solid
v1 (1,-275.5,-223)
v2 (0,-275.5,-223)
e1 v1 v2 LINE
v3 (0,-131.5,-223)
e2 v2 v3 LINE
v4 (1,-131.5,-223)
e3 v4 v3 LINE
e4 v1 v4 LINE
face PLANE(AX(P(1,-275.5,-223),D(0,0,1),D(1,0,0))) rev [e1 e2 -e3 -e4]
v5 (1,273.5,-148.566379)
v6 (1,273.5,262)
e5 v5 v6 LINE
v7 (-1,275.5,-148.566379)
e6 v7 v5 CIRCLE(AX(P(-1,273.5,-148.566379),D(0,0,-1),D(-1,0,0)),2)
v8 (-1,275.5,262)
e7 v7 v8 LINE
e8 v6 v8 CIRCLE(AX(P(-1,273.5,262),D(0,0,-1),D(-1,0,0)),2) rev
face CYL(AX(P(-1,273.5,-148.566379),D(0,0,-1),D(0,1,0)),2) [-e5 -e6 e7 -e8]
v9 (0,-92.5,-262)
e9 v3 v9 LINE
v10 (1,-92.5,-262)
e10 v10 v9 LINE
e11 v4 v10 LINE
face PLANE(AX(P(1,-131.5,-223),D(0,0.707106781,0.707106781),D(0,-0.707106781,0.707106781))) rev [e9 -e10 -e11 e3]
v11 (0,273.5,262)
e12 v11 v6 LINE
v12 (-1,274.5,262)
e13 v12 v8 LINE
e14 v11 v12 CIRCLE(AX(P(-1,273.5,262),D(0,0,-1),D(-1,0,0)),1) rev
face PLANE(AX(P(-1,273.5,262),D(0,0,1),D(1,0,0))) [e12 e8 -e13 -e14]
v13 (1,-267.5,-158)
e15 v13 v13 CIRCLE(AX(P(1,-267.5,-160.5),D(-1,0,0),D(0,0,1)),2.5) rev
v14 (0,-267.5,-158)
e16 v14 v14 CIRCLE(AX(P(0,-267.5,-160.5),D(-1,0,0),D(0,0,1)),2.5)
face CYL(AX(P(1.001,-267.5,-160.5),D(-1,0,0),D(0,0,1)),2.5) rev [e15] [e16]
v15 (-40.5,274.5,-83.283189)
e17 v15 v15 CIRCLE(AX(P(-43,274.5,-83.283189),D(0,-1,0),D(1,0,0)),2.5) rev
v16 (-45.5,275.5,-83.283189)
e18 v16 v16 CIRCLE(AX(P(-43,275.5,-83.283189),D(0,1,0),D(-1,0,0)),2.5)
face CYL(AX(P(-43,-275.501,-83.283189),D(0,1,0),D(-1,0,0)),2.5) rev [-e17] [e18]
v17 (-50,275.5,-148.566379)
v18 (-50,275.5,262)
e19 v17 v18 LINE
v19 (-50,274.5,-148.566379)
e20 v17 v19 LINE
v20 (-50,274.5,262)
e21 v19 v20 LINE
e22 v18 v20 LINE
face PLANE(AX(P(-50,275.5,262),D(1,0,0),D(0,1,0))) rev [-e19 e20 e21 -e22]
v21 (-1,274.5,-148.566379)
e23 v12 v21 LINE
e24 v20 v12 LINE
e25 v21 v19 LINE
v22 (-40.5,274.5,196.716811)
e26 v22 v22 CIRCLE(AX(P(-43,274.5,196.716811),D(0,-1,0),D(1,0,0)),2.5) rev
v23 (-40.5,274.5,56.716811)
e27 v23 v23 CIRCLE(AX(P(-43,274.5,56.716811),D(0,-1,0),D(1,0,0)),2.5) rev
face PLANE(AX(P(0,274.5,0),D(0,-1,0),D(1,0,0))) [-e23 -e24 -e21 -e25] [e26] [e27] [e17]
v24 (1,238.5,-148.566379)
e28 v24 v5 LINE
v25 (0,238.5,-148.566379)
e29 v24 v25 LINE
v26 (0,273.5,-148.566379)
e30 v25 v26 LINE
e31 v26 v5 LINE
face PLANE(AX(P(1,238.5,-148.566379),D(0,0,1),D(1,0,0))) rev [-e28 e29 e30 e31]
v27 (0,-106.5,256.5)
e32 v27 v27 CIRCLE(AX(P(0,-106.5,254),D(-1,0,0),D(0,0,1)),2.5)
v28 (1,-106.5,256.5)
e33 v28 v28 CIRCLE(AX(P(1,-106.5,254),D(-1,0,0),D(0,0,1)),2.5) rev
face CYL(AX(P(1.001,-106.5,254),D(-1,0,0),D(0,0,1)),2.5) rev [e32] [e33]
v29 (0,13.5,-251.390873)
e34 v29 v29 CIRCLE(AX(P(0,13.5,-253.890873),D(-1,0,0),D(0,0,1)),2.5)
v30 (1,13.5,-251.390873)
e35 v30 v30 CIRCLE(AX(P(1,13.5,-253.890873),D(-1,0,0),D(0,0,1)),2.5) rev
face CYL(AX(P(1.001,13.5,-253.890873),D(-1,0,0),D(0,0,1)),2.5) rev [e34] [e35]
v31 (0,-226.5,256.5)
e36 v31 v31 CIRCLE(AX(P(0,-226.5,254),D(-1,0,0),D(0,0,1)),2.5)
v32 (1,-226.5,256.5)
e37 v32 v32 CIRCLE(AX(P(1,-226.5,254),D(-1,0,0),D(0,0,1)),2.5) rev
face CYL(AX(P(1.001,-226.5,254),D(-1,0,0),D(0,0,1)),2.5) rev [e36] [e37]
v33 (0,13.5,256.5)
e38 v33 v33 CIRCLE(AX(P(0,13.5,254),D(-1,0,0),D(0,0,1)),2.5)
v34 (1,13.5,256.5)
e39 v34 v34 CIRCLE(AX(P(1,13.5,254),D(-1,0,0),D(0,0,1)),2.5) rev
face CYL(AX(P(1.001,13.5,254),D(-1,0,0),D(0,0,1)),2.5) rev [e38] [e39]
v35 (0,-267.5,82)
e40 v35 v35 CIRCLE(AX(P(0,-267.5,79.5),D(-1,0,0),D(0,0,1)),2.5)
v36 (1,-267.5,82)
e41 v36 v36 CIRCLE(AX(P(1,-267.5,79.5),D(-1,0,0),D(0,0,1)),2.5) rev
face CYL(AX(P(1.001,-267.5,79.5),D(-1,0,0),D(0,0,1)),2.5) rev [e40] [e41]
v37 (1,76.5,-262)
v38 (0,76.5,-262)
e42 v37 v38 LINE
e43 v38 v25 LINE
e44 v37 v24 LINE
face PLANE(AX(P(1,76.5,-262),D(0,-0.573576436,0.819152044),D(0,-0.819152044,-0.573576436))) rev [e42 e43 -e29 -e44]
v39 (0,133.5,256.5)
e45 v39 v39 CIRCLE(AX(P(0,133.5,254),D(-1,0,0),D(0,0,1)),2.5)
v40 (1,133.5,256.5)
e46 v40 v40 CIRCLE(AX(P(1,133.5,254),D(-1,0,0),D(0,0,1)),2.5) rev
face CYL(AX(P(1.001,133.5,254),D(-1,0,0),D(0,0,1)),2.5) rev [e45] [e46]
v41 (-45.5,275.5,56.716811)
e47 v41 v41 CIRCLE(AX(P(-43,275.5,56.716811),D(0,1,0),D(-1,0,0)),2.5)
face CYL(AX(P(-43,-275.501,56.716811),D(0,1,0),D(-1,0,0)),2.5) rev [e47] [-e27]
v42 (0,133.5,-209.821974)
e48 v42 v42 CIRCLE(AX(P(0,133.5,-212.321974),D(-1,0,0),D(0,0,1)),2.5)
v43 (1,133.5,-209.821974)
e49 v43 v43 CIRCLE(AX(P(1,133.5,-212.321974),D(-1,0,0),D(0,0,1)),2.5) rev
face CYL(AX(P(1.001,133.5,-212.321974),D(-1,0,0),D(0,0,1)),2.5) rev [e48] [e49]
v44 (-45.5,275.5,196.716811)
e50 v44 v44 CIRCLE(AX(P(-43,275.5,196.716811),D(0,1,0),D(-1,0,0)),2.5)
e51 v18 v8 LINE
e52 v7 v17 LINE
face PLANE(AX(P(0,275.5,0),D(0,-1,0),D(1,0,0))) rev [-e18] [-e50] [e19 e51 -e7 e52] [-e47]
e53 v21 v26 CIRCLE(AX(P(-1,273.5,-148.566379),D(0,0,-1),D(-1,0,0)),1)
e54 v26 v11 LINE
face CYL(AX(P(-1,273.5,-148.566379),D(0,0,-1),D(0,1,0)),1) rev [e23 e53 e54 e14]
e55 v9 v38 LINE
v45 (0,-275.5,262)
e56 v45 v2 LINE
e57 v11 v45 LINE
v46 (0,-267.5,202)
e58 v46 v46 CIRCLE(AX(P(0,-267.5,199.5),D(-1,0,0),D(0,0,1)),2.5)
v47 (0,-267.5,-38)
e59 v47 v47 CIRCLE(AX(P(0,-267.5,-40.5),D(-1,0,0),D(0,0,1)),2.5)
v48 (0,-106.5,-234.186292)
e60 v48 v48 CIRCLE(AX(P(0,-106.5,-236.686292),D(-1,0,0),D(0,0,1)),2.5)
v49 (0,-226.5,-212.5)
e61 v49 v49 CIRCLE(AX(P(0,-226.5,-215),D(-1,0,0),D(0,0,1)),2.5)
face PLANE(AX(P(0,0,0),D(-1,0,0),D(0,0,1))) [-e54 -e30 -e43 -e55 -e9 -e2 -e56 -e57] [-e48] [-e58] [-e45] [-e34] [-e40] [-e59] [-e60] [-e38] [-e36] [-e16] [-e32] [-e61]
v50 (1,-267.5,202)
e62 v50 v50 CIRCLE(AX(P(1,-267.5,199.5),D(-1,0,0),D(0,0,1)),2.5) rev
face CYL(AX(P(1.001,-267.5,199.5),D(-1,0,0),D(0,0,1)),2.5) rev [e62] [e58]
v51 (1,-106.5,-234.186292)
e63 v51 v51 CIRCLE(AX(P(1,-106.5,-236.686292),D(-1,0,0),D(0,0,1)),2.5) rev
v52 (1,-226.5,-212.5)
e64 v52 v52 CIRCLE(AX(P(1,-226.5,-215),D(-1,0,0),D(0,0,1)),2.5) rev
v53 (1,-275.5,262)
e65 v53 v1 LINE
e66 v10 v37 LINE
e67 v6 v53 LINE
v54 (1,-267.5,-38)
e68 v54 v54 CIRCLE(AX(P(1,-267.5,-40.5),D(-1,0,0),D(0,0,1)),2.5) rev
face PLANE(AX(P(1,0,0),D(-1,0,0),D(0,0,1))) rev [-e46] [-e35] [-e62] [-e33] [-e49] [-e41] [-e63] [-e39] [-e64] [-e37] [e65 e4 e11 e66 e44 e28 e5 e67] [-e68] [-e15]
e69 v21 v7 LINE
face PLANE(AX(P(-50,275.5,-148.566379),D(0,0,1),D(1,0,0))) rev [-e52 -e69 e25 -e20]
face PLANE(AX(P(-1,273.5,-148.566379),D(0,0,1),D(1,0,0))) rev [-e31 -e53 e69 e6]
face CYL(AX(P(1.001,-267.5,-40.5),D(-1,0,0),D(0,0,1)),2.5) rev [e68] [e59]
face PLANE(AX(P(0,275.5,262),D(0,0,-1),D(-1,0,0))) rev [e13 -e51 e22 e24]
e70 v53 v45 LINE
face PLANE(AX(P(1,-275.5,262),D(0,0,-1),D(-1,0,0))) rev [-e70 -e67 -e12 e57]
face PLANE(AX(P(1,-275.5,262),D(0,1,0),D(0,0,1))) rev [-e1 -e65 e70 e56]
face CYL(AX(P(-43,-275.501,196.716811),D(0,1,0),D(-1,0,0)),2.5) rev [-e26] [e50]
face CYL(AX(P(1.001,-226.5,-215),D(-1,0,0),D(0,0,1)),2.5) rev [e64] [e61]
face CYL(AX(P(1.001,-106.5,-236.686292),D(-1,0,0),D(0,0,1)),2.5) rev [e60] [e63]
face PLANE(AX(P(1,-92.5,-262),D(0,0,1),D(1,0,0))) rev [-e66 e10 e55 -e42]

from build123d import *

# Parameters (mm, degrees)
EXTRUDE_1_DEPTH                  = 1
SM_EDGE_FLANGE_1_STRIP_W         = 6
SM_EDGE_FLANGE_1_STRIP_H         = 1
SM_EDGE_FLANGE_1_STRIP_CUT_DEPTH = 410.56637881
SM_EDGE_FLANGE_1_DEPTH           = 410.56637881
CUT_EXTRUDE_1_REACH              = 385.463
SKETCH_12_R                      = 2.5
CUT_EXTRUDE_2_REACH              = 614.164
SKETCH_13_R                      = 2.5


# Sheet-metal steps are written as plain solids
with BuildPart() as part:
    # Sketch 1 → Бобышка-Вытянуть1 (new body)
    with BuildSketch(Plane(origin=(0, 0, 0), x_dir=(0, 0, -1), z_dir=(1, 0, 0))):
        Polygon((223, -275.5), (223, -131.5), (262, -92.5), (262, 76.5), (148.56637881, 238.5), (148.56637881, 275.5), (-262, 275.5), (-262, -275.5), align=None)
    extrude(amount=EXTRUDE_1_DEPTH)

    # Ребро-кромка1 strip (across the edge) → Ребро-кромка1 strip cut (cut)
    with BuildSketch(Plane(origin=(0, 275.5, 262), x_dir=(0, -1, 0), z_dir=(0, 0, -1))):
        with Locations((-1, -0.5)):
            Rectangle(SM_EDGE_FLANGE_1_STRIP_W, SM_EDGE_FLANGE_1_STRIP_H)
    extrude(amount=SM_EDGE_FLANGE_1_STRIP_CUT_DEPTH, mode=Mode.SUBTRACT)

    # Ребро-кромка1 section (across the edge) → Ребро-кромка1 (add)
    with BuildSketch(Plane(origin=(0, 275.5, 262), x_dir=(0, -1, 0), z_dir=(0, 0, -1))):
        with BuildLine():
            Line((0, 1), (0, 50))
            Line((0, 50), (1, 50))
            Line((1, 50), (1, 1))
            ThreePointArc((1, 1), (1.292893219, 0.292893219), (2, 0))
            Line((2, 0), (2, -1))
            ThreePointArc((2, -1), (0.585786438, -0.414213562), (0, 1))
        make_face()
    extrude(amount=SM_EDGE_FLANGE_1_DEPTH)

    # Эскиз12 → Вырез-Вытянуть1 (cut, up to next)
    with BuildSketch(Plane.ZY, mode=Mode.PRIVATE) as cut_extrude_1_sk1:
        with Locations((254, 133.5)):
            Circle(SKETCH_12_R)
    cut_extrude_1_tool1 = extrude(cut_extrude_1_sk1.sketch, amount=-CUT_EXTRUDE_1_REACH, mode=Mode.PRIVATE) & part.part
    # Эскиз12 → Вырез-Вытянуть1 (cut, up to next)
    with BuildSketch(Plane.ZY, mode=Mode.PRIVATE) as cut_extrude_1_sk2:
        with Locations((254, 13.5)):
            Circle(SKETCH_12_R)
    cut_extrude_1_tool2 = extrude(cut_extrude_1_sk2.sketch, amount=-CUT_EXTRUDE_1_REACH, mode=Mode.PRIVATE) & part.part
    # Эскиз12 → Вырез-Вытянуть1 (cut, up to next)
    with BuildSketch(Plane.ZY, mode=Mode.PRIVATE) as cut_extrude_1_sk3:
        with Locations((254, -106.5)):
            Circle(SKETCH_12_R)
    cut_extrude_1_tool3 = extrude(cut_extrude_1_sk3.sketch, amount=-CUT_EXTRUDE_1_REACH, mode=Mode.PRIVATE) & part.part
    # Эскиз12 → Вырез-Вытянуть1 (cut, up to next)
    with BuildSketch(Plane.ZY, mode=Mode.PRIVATE) as cut_extrude_1_sk4:
        with Locations((254, -226.5)):
            Circle(SKETCH_12_R)
    cut_extrude_1_tool4 = extrude(cut_extrude_1_sk4.sketch, amount=-CUT_EXTRUDE_1_REACH, mode=Mode.PRIVATE) & part.part
    # Эскиз12 → Вырез-Вытянуть1 (cut, up to next)
    with BuildSketch(Plane.ZY, mode=Mode.PRIVATE) as cut_extrude_1_sk5:
        with Locations((199.5, -267.5)):
            Circle(SKETCH_12_R)
    cut_extrude_1_tool5 = extrude(cut_extrude_1_sk5.sketch, amount=-CUT_EXTRUDE_1_REACH, mode=Mode.PRIVATE) & part.part
    # Эскиз12 → Вырез-Вытянуть1 (cut, up to next)
    with BuildSketch(Plane.ZY, mode=Mode.PRIVATE) as cut_extrude_1_sk6:
        with Locations((79.5, -267.5)):
            Circle(SKETCH_12_R)
    cut_extrude_1_tool6 = extrude(cut_extrude_1_sk6.sketch, amount=-CUT_EXTRUDE_1_REACH, mode=Mode.PRIVATE) & part.part
    # Эскиз12 → Вырез-Вытянуть1 (cut, up to next)
    with BuildSketch(Plane.ZY, mode=Mode.PRIVATE) as cut_extrude_1_sk7:
        with Locations((-40.5, -267.5)):
            Circle(SKETCH_12_R)
    cut_extrude_1_tool7 = extrude(cut_extrude_1_sk7.sketch, amount=-CUT_EXTRUDE_1_REACH, mode=Mode.PRIVATE) & part.part
    # Эскиз12 → Вырез-Вытянуть1 (cut, up to next)
    with BuildSketch(Plane.ZY, mode=Mode.PRIVATE) as cut_extrude_1_sk8:
        with Locations((-160.5, -267.5)):
            Circle(SKETCH_12_R)
    cut_extrude_1_tool8 = extrude(cut_extrude_1_sk8.sketch, amount=-CUT_EXTRUDE_1_REACH, mode=Mode.PRIVATE) & part.part
    # Эскиз12 → Вырез-Вытянуть1 (cut, up to next)
    with BuildSketch(Plane.ZY, mode=Mode.PRIVATE) as cut_extrude_1_sk9:
        with Locations((-215, -226.5)):
            Circle(SKETCH_12_R)
    cut_extrude_1_tool9 = extrude(cut_extrude_1_sk9.sketch, amount=-CUT_EXTRUDE_1_REACH, mode=Mode.PRIVATE) & part.part
    # Эскиз12 → Вырез-Вытянуть1 (cut, up to next)
    with BuildSketch(Plane.ZY, mode=Mode.PRIVATE) as cut_extrude_1_sk10:
        with Locations((-236.686291501, -106.5)):
            Circle(SKETCH_12_R)
    cut_extrude_1_tool10 = extrude(cut_extrude_1_sk10.sketch, amount=-CUT_EXTRUDE_1_REACH, mode=Mode.PRIVATE) & part.part
    # Эскиз12 → Вырез-Вытянуть1 (cut, up to next)
    with BuildSketch(Plane.ZY, mode=Mode.PRIVATE) as cut_extrude_1_sk11:
        with Locations((-253.890872965, 13.5)):
            Circle(SKETCH_12_R)
    cut_extrude_1_tool11 = extrude(cut_extrude_1_sk11.sketch, amount=-CUT_EXTRUDE_1_REACH, mode=Mode.PRIVATE) & part.part
    # Эскиз12 → Вырез-Вытянуть1 (cut, up to next)
    with BuildSketch(Plane.ZY, mode=Mode.PRIVATE) as cut_extrude_1_sk12:
        with Locations((-212.321973612, 133.5)):
            Circle(SKETCH_12_R)
    cut_extrude_1_tool12 = extrude(cut_extrude_1_sk12.sketch, amount=-CUT_EXTRUDE_1_REACH, mode=Mode.PRIVATE) & part.part
    add(cut_extrude_1_tool1.solids().sort_by_distance((0, 133.5, 254))[0], mode=Mode.SUBTRACT)
    add(cut_extrude_1_tool2.solids().sort_by_distance((0, 13.5, 254))[0], mode=Mode.SUBTRACT)
    add(cut_extrude_1_tool3.solids().sort_by_distance((0, -106.5, 254))[0], mode=Mode.SUBTRACT)
    add(cut_extrude_1_tool4.solids().sort_by_distance((0, -226.5, 254))[0], mode=Mode.SUBTRACT)
    add(cut_extrude_1_tool5.solids().sort_by_distance((0, -267.5, 199.5))[0], mode=Mode.SUBTRACT)
    add(cut_extrude_1_tool6.solids().sort_by_distance((0, -267.5, 79.5))[0], mode=Mode.SUBTRACT)
    add(cut_extrude_1_tool7.solids().sort_by_distance((0, -267.5, -40.5))[0], mode=Mode.SUBTRACT)
    add(cut_extrude_1_tool8.solids().sort_by_distance((0, -267.5, -160.5))[0], mode=Mode.SUBTRACT)
    add(cut_extrude_1_tool9.solids().sort_by_distance((0, -226.5, -215))[0], mode=Mode.SUBTRACT)
    add(cut_extrude_1_tool10.solids().sort_by_distance((0, -106.5, -236.686292))[0], mode=Mode.SUBTRACT)
    add(cut_extrude_1_tool11.solids().sort_by_distance((0, 13.5, -253.890873))[0], mode=Mode.SUBTRACT)
    add(cut_extrude_1_tool12.solids().sort_by_distance((0, 133.5, -212.321974))[0], mode=Mode.SUBTRACT)

    # Эскиз13 → Вырез-Вытянуть2 (cut, up to next)
    with BuildSketch(Plane(origin=(0, 275.5, 0), x_dir=(1, 0, 0), z_dir=(0, 1, 0)), mode=Mode.PRIVATE) as cut_extrude_2_sk1:
        with Locations(Location((-43, -196.716810595, 0), (0, 0, 180))):
            Circle(SKETCH_13_R)
    cut_extrude_2_tool1 = extrude(cut_extrude_2_sk1.sketch, amount=-CUT_EXTRUDE_2_REACH, mode=Mode.PRIVATE) & part.part
    # Эскиз13 → Вырез-Вытянуть2 (cut, up to next)
    with BuildSketch(Plane(origin=(0, 275.5, 0), x_dir=(1, 0, 0), z_dir=(0, 1, 0)), mode=Mode.PRIVATE) as cut_extrude_2_sk2:
        with Locations(Location((-43, -56.716810595, 0), (0, 0, 180))):
            Circle(SKETCH_13_R)
    cut_extrude_2_tool2 = extrude(cut_extrude_2_sk2.sketch, amount=-CUT_EXTRUDE_2_REACH, mode=Mode.PRIVATE) & part.part
    # Эскиз13 → Вырез-Вытянуть2 (cut, up to next)
    with BuildSketch(Plane(origin=(0, 275.5, 0), x_dir=(1, 0, 0), z_dir=(0, 1, 0)), mode=Mode.PRIVATE) as cut_extrude_2_sk3:
        with Locations(Location((-43, 83.283189405, 0), (0, 0, 180))):
            Circle(SKETCH_13_R)
    cut_extrude_2_tool3 = extrude(cut_extrude_2_sk3.sketch, amount=-CUT_EXTRUDE_2_REACH, mode=Mode.PRIVATE) & part.part
    add(cut_extrude_2_tool1.solids().sort_by_distance((-43, 275.5, 196.716811))[0], mode=Mode.SUBTRACT)
    add(cut_extrude_2_tool2.solids().sort_by_distance((-43, 275.5, 56.716811))[0], mode=Mode.SUBTRACT)
    add(cut_extrude_2_tool3.solids().sort_by_distance((-43, 275.5, -83.283189))[0], mode=Mode.SUBTRACT)


solid = part.part
